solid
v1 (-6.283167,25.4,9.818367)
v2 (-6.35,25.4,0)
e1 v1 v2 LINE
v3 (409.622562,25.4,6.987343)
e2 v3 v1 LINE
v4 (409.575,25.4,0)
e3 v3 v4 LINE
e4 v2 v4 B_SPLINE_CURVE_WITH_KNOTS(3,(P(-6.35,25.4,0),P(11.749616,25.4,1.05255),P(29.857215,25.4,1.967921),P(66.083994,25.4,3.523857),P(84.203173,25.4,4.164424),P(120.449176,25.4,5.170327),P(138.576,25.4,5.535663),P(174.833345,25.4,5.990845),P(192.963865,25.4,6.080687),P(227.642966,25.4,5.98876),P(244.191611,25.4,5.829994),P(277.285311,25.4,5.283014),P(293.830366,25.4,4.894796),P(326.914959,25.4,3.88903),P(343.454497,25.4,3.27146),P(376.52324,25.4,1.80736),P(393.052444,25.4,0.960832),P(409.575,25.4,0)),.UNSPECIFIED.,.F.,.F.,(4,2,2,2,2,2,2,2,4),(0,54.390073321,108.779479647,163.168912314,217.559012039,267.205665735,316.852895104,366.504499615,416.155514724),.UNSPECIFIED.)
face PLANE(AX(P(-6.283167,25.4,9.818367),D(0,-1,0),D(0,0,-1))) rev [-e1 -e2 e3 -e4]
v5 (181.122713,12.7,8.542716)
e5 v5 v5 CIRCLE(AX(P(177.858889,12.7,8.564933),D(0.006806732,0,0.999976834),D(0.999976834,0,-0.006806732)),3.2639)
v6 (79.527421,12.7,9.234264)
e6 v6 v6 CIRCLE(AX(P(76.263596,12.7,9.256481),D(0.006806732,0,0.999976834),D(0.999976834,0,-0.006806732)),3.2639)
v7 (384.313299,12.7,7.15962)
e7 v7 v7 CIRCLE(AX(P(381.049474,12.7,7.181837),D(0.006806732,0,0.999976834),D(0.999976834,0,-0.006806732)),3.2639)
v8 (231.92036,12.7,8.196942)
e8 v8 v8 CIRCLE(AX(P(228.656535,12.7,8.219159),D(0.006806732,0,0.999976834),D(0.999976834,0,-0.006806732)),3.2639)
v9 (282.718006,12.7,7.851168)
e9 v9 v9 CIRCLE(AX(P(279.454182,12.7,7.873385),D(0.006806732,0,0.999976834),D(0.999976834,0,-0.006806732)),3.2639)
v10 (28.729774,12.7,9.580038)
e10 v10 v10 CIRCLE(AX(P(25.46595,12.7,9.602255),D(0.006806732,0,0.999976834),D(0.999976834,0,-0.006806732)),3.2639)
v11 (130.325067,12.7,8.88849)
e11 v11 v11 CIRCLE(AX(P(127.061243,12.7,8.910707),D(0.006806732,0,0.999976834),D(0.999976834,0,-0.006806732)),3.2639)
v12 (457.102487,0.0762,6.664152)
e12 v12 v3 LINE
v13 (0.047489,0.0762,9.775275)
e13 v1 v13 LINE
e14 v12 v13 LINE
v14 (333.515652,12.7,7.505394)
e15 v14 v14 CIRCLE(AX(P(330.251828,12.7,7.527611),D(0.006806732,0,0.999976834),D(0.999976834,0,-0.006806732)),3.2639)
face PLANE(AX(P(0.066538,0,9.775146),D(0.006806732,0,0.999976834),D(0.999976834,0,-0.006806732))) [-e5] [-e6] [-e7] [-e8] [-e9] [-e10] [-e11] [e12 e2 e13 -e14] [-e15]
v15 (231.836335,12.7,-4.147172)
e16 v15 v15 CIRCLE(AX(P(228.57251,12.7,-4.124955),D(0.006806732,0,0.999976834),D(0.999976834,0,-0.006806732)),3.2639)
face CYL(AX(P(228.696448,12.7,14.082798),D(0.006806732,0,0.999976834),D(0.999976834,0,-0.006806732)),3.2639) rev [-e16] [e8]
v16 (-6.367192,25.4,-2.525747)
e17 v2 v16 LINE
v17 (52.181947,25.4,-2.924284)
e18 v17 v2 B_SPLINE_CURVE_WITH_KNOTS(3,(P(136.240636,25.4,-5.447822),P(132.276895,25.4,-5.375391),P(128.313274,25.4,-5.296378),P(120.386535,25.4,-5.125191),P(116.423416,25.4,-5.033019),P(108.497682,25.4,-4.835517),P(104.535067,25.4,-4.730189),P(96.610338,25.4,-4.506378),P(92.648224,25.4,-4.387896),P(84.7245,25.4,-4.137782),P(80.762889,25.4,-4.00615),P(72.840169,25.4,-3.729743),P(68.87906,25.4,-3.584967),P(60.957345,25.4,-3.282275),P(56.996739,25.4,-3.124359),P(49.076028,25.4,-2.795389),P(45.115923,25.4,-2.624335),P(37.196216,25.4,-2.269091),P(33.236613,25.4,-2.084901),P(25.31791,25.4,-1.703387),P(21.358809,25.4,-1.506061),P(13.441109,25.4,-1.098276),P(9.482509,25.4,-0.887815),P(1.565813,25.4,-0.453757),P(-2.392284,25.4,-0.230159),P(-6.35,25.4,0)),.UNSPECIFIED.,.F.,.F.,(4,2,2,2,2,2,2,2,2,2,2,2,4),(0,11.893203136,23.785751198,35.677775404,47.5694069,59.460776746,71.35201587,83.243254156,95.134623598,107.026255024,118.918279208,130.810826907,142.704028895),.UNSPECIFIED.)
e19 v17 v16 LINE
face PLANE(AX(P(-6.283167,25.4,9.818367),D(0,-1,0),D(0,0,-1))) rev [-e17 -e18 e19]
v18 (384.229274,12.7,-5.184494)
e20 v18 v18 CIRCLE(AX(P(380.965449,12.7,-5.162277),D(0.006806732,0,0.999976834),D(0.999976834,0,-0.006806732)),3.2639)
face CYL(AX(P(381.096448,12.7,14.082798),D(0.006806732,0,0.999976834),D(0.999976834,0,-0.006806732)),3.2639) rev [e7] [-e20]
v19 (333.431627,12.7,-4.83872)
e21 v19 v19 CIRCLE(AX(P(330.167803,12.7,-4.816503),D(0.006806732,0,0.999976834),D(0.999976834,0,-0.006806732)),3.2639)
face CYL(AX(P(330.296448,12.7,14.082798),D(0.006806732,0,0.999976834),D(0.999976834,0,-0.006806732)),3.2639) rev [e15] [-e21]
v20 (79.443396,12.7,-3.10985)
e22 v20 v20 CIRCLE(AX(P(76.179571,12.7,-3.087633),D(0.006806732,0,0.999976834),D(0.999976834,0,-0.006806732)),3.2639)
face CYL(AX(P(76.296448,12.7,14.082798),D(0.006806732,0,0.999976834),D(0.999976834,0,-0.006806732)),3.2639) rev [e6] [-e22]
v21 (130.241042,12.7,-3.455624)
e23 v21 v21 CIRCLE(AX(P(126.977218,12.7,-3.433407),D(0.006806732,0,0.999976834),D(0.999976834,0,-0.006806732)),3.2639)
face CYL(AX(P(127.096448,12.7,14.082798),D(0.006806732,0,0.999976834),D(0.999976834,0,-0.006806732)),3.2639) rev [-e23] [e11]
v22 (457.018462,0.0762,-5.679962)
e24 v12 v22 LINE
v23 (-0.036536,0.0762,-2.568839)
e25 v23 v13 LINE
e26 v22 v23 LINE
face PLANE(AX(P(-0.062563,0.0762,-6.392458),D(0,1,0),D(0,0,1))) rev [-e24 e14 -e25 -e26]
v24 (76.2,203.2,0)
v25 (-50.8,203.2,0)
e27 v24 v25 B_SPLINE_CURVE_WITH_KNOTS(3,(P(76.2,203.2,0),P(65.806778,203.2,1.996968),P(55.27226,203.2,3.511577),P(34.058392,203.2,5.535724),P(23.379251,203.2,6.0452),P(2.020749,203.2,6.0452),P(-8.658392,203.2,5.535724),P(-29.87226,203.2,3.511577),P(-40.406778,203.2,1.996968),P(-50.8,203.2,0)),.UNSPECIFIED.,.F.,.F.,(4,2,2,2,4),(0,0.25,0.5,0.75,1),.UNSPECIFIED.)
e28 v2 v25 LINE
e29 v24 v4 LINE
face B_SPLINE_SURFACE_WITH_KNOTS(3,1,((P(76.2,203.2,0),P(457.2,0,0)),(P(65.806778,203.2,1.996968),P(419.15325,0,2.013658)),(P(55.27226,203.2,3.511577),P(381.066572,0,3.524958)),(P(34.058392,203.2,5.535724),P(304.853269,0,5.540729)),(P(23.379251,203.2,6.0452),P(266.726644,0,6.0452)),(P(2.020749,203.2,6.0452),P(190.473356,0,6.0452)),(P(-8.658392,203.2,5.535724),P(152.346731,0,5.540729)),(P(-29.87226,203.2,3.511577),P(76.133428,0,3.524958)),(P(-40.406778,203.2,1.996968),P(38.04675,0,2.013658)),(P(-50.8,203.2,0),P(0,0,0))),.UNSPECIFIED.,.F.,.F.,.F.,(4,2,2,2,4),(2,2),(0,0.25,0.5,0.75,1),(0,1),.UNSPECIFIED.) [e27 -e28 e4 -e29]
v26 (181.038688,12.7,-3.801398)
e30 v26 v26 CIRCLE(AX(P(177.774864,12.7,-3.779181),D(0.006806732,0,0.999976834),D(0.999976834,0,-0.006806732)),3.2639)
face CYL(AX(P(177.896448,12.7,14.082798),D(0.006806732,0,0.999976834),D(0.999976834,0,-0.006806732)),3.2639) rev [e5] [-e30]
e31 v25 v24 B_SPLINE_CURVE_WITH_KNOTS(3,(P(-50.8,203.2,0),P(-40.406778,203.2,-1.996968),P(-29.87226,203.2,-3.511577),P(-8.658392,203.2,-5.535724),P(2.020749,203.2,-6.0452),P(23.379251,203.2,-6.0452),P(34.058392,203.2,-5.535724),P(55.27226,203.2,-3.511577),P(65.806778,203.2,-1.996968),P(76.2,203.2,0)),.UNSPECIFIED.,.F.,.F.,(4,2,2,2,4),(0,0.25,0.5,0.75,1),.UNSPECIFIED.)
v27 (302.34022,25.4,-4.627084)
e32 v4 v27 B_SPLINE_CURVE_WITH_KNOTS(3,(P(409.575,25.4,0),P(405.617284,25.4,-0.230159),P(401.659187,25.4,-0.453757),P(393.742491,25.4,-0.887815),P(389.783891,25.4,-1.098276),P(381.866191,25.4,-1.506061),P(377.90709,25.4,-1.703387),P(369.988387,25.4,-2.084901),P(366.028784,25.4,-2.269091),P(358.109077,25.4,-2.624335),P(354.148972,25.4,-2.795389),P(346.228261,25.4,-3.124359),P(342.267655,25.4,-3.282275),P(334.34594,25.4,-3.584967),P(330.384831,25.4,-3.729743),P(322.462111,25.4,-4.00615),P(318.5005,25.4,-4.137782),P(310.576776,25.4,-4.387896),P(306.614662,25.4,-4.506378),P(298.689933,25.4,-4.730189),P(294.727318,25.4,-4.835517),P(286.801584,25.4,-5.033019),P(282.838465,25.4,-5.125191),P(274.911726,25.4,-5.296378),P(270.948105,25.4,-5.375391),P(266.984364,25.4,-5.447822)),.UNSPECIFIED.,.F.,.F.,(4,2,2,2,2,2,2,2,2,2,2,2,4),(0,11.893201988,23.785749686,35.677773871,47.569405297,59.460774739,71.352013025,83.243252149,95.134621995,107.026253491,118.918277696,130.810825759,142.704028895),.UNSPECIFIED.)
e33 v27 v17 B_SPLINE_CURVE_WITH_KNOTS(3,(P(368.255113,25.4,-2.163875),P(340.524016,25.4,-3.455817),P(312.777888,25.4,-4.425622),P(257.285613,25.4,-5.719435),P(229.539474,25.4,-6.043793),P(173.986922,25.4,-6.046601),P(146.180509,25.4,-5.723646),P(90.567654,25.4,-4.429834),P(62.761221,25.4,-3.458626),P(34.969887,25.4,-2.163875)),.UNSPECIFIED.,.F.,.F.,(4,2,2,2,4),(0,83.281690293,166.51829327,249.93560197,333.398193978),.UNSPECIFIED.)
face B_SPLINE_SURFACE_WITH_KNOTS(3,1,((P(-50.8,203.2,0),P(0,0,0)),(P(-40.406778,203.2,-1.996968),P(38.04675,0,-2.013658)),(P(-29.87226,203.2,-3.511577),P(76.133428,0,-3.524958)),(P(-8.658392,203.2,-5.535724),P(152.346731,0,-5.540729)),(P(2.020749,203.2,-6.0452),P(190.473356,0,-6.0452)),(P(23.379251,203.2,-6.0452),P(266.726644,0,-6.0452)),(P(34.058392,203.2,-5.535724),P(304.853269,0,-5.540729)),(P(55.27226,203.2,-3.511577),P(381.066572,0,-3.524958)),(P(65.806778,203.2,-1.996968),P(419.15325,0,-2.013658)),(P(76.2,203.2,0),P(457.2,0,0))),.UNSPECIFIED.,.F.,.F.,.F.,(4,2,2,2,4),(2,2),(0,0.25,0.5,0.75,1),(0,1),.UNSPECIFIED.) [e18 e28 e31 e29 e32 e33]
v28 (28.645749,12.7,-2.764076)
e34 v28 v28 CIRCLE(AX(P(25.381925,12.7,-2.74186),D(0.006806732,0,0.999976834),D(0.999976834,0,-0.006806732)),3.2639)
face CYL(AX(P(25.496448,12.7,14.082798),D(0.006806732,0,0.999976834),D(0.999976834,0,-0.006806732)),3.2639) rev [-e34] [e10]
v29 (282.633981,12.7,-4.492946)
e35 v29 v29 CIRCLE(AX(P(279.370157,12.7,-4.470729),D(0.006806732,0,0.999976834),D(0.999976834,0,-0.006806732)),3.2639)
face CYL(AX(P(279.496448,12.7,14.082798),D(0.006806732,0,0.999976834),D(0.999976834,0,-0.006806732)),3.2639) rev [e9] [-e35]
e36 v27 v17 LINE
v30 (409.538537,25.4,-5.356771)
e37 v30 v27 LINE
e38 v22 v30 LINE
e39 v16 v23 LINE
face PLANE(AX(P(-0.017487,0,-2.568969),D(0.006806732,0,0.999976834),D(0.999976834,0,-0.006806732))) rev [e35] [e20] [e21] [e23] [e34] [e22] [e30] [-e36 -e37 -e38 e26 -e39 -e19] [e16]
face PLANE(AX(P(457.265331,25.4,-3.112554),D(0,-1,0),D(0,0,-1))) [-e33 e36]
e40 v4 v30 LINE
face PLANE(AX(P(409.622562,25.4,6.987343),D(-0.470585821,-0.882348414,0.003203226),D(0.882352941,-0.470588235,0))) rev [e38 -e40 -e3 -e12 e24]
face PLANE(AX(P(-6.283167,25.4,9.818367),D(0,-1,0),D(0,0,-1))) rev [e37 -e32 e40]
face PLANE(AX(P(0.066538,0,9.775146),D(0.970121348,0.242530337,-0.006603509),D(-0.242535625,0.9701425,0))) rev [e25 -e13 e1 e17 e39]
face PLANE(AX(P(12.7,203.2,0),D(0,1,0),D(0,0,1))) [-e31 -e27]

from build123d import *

# Parameters (mm, degrees)
BOSS_EXTRUDE1_DEPTH     = 12.3444
CUT_EXTRUDE1_DEPTH      = 501.459744256
CUT_EXTRUDE1_DEPTH_BACK = 501.459744256
SKETCH12_W              = 6.35
SKETCH12_H              = 25.4
F_1_4_CLEARANCE_HOLE1_D = 6.5278
LPATTERN1_COUNT         = 8
LPATTERN1_PITCH         = 50.8
SKETCH14_W              = 457.208458034
SKETCH14_H              = 25.4
CUT_EXTRUDE2_DEPTH      = 501.552688803


with BuildPart() as part:
    # Sketch5 for Loft4 → Loft4 section 0
    with BuildSketch(Plane(origin=(0, 203.2, 0), x_dir=(1, 0, 0), z_dir=(0, 1, 0))):
        with BuildLine():
            # circular arc as an exact rational Bezier (weights 1, cos(half-angle), 1)
            Bezier((-50.8, 0), (12.7, 12.200977951), (76.2, 0), weights=[1, 0.982036722, 1])
            Bezier((76.2, 0), (12.7, -12.200977951), (-50.8, 0), weights=[1, 0.982036722, 1])
        make_face()
    # Sketch1 for Loft4 → Loft4 section 1
    with BuildSketch(Plane(origin=(0, 0, 0), x_dir=(1, 0, 0), z_dir=(0, 1, 0))):
        with BuildLine():
            Bezier((0, 0), (228.6, 12.098860838), (457.2, 0), weights=[1, 0.99860236, 1])
            Bezier((457.2, 0), (228.6, -12.098860838), (0, 0), weights=[1, 0.99860236, 1])
        make_face()
    loft()

    # Sketch10 → Boss-Extrude1 (add)
    with BuildSketch(Plane(origin=(-0.017486684, 0, -2.568968528), x_dir=(0, -1, 0), z_dir=(0.006806731520561807, 0, 0.9999768339346702))):
        Polygon((0, 457.189408475), (0, 0), (-25.4, -6.349852895), (-25.4, 409.565511759), align=None)
    extrude(amount=BOSS_EXTRUDE1_DEPTH)

    # Sketch12 → Cut-Extrude1 (cut, two sides: drawn at the far end of the back side and taken through both)
    with BuildSketch(Plane(origin=(0, 0, 0), x_dir=(0.006806731520561809, 0, 0.9999768339346703), z_dir=(-0.9999768339346703, 0, 0.006806731520561809)).offset(-CUT_EXTRUDE1_DEPTH_BACK)):
        with Locations((12.950371958, 12.7)):
            Rectangle(SKETCH12_W, SKETCH12_H)
        with Locations((-5.744028042, 12.7)):
            Rectangle(SKETCH12_W, SKETCH12_H)
    extrude(amount=CUT_EXTRUDE1_DEPTH + CUT_EXTRUDE1_DEPTH_BACK, mode=Mode.SUBTRACT)

    # 1/4 Clearance Hole1 (through all)
    with Locations(Plane(origin=(0.097036893, 0, 14.25568857), x_dir=(0, -1, 0), z_dir=(0.006806731520561807, 0, 0.9999768339346702))):
        with Locations((-12.7, 25.4)):
            f_1_4_clearance_hole1 = Hole(F_1_4_CLEARANCE_HOLE1_D / 2)

    # LPattern1: 1/4 Clearance Hole1 ×8
    with Locations(*[(i * LPATTERN1_PITCH, 0, 0) for i in range(1, LPATTERN1_COUNT)]):
        add(f_1_4_clearance_hole1, mode=Mode.SUBTRACT)

    # Sketch14 → Cut-Extrude2 (cut, through all)
    with BuildSketch(Plane(origin=(0.066538332, 0, 9.775145501), x_dir=(0.9999768339346702, 0, -0.006806731520561792), z_dir=(0.006806731520561792, 0, 0.9999768339346703))):
        with Locations((228.585179458, -12.6238)):
            Rectangle(SKETCH14_W, SKETCH14_H)
    extrude(amount=-CUT_EXTRUDE2_DEPTH, mode=Mode.SUBTRACT)


solid = part.part
